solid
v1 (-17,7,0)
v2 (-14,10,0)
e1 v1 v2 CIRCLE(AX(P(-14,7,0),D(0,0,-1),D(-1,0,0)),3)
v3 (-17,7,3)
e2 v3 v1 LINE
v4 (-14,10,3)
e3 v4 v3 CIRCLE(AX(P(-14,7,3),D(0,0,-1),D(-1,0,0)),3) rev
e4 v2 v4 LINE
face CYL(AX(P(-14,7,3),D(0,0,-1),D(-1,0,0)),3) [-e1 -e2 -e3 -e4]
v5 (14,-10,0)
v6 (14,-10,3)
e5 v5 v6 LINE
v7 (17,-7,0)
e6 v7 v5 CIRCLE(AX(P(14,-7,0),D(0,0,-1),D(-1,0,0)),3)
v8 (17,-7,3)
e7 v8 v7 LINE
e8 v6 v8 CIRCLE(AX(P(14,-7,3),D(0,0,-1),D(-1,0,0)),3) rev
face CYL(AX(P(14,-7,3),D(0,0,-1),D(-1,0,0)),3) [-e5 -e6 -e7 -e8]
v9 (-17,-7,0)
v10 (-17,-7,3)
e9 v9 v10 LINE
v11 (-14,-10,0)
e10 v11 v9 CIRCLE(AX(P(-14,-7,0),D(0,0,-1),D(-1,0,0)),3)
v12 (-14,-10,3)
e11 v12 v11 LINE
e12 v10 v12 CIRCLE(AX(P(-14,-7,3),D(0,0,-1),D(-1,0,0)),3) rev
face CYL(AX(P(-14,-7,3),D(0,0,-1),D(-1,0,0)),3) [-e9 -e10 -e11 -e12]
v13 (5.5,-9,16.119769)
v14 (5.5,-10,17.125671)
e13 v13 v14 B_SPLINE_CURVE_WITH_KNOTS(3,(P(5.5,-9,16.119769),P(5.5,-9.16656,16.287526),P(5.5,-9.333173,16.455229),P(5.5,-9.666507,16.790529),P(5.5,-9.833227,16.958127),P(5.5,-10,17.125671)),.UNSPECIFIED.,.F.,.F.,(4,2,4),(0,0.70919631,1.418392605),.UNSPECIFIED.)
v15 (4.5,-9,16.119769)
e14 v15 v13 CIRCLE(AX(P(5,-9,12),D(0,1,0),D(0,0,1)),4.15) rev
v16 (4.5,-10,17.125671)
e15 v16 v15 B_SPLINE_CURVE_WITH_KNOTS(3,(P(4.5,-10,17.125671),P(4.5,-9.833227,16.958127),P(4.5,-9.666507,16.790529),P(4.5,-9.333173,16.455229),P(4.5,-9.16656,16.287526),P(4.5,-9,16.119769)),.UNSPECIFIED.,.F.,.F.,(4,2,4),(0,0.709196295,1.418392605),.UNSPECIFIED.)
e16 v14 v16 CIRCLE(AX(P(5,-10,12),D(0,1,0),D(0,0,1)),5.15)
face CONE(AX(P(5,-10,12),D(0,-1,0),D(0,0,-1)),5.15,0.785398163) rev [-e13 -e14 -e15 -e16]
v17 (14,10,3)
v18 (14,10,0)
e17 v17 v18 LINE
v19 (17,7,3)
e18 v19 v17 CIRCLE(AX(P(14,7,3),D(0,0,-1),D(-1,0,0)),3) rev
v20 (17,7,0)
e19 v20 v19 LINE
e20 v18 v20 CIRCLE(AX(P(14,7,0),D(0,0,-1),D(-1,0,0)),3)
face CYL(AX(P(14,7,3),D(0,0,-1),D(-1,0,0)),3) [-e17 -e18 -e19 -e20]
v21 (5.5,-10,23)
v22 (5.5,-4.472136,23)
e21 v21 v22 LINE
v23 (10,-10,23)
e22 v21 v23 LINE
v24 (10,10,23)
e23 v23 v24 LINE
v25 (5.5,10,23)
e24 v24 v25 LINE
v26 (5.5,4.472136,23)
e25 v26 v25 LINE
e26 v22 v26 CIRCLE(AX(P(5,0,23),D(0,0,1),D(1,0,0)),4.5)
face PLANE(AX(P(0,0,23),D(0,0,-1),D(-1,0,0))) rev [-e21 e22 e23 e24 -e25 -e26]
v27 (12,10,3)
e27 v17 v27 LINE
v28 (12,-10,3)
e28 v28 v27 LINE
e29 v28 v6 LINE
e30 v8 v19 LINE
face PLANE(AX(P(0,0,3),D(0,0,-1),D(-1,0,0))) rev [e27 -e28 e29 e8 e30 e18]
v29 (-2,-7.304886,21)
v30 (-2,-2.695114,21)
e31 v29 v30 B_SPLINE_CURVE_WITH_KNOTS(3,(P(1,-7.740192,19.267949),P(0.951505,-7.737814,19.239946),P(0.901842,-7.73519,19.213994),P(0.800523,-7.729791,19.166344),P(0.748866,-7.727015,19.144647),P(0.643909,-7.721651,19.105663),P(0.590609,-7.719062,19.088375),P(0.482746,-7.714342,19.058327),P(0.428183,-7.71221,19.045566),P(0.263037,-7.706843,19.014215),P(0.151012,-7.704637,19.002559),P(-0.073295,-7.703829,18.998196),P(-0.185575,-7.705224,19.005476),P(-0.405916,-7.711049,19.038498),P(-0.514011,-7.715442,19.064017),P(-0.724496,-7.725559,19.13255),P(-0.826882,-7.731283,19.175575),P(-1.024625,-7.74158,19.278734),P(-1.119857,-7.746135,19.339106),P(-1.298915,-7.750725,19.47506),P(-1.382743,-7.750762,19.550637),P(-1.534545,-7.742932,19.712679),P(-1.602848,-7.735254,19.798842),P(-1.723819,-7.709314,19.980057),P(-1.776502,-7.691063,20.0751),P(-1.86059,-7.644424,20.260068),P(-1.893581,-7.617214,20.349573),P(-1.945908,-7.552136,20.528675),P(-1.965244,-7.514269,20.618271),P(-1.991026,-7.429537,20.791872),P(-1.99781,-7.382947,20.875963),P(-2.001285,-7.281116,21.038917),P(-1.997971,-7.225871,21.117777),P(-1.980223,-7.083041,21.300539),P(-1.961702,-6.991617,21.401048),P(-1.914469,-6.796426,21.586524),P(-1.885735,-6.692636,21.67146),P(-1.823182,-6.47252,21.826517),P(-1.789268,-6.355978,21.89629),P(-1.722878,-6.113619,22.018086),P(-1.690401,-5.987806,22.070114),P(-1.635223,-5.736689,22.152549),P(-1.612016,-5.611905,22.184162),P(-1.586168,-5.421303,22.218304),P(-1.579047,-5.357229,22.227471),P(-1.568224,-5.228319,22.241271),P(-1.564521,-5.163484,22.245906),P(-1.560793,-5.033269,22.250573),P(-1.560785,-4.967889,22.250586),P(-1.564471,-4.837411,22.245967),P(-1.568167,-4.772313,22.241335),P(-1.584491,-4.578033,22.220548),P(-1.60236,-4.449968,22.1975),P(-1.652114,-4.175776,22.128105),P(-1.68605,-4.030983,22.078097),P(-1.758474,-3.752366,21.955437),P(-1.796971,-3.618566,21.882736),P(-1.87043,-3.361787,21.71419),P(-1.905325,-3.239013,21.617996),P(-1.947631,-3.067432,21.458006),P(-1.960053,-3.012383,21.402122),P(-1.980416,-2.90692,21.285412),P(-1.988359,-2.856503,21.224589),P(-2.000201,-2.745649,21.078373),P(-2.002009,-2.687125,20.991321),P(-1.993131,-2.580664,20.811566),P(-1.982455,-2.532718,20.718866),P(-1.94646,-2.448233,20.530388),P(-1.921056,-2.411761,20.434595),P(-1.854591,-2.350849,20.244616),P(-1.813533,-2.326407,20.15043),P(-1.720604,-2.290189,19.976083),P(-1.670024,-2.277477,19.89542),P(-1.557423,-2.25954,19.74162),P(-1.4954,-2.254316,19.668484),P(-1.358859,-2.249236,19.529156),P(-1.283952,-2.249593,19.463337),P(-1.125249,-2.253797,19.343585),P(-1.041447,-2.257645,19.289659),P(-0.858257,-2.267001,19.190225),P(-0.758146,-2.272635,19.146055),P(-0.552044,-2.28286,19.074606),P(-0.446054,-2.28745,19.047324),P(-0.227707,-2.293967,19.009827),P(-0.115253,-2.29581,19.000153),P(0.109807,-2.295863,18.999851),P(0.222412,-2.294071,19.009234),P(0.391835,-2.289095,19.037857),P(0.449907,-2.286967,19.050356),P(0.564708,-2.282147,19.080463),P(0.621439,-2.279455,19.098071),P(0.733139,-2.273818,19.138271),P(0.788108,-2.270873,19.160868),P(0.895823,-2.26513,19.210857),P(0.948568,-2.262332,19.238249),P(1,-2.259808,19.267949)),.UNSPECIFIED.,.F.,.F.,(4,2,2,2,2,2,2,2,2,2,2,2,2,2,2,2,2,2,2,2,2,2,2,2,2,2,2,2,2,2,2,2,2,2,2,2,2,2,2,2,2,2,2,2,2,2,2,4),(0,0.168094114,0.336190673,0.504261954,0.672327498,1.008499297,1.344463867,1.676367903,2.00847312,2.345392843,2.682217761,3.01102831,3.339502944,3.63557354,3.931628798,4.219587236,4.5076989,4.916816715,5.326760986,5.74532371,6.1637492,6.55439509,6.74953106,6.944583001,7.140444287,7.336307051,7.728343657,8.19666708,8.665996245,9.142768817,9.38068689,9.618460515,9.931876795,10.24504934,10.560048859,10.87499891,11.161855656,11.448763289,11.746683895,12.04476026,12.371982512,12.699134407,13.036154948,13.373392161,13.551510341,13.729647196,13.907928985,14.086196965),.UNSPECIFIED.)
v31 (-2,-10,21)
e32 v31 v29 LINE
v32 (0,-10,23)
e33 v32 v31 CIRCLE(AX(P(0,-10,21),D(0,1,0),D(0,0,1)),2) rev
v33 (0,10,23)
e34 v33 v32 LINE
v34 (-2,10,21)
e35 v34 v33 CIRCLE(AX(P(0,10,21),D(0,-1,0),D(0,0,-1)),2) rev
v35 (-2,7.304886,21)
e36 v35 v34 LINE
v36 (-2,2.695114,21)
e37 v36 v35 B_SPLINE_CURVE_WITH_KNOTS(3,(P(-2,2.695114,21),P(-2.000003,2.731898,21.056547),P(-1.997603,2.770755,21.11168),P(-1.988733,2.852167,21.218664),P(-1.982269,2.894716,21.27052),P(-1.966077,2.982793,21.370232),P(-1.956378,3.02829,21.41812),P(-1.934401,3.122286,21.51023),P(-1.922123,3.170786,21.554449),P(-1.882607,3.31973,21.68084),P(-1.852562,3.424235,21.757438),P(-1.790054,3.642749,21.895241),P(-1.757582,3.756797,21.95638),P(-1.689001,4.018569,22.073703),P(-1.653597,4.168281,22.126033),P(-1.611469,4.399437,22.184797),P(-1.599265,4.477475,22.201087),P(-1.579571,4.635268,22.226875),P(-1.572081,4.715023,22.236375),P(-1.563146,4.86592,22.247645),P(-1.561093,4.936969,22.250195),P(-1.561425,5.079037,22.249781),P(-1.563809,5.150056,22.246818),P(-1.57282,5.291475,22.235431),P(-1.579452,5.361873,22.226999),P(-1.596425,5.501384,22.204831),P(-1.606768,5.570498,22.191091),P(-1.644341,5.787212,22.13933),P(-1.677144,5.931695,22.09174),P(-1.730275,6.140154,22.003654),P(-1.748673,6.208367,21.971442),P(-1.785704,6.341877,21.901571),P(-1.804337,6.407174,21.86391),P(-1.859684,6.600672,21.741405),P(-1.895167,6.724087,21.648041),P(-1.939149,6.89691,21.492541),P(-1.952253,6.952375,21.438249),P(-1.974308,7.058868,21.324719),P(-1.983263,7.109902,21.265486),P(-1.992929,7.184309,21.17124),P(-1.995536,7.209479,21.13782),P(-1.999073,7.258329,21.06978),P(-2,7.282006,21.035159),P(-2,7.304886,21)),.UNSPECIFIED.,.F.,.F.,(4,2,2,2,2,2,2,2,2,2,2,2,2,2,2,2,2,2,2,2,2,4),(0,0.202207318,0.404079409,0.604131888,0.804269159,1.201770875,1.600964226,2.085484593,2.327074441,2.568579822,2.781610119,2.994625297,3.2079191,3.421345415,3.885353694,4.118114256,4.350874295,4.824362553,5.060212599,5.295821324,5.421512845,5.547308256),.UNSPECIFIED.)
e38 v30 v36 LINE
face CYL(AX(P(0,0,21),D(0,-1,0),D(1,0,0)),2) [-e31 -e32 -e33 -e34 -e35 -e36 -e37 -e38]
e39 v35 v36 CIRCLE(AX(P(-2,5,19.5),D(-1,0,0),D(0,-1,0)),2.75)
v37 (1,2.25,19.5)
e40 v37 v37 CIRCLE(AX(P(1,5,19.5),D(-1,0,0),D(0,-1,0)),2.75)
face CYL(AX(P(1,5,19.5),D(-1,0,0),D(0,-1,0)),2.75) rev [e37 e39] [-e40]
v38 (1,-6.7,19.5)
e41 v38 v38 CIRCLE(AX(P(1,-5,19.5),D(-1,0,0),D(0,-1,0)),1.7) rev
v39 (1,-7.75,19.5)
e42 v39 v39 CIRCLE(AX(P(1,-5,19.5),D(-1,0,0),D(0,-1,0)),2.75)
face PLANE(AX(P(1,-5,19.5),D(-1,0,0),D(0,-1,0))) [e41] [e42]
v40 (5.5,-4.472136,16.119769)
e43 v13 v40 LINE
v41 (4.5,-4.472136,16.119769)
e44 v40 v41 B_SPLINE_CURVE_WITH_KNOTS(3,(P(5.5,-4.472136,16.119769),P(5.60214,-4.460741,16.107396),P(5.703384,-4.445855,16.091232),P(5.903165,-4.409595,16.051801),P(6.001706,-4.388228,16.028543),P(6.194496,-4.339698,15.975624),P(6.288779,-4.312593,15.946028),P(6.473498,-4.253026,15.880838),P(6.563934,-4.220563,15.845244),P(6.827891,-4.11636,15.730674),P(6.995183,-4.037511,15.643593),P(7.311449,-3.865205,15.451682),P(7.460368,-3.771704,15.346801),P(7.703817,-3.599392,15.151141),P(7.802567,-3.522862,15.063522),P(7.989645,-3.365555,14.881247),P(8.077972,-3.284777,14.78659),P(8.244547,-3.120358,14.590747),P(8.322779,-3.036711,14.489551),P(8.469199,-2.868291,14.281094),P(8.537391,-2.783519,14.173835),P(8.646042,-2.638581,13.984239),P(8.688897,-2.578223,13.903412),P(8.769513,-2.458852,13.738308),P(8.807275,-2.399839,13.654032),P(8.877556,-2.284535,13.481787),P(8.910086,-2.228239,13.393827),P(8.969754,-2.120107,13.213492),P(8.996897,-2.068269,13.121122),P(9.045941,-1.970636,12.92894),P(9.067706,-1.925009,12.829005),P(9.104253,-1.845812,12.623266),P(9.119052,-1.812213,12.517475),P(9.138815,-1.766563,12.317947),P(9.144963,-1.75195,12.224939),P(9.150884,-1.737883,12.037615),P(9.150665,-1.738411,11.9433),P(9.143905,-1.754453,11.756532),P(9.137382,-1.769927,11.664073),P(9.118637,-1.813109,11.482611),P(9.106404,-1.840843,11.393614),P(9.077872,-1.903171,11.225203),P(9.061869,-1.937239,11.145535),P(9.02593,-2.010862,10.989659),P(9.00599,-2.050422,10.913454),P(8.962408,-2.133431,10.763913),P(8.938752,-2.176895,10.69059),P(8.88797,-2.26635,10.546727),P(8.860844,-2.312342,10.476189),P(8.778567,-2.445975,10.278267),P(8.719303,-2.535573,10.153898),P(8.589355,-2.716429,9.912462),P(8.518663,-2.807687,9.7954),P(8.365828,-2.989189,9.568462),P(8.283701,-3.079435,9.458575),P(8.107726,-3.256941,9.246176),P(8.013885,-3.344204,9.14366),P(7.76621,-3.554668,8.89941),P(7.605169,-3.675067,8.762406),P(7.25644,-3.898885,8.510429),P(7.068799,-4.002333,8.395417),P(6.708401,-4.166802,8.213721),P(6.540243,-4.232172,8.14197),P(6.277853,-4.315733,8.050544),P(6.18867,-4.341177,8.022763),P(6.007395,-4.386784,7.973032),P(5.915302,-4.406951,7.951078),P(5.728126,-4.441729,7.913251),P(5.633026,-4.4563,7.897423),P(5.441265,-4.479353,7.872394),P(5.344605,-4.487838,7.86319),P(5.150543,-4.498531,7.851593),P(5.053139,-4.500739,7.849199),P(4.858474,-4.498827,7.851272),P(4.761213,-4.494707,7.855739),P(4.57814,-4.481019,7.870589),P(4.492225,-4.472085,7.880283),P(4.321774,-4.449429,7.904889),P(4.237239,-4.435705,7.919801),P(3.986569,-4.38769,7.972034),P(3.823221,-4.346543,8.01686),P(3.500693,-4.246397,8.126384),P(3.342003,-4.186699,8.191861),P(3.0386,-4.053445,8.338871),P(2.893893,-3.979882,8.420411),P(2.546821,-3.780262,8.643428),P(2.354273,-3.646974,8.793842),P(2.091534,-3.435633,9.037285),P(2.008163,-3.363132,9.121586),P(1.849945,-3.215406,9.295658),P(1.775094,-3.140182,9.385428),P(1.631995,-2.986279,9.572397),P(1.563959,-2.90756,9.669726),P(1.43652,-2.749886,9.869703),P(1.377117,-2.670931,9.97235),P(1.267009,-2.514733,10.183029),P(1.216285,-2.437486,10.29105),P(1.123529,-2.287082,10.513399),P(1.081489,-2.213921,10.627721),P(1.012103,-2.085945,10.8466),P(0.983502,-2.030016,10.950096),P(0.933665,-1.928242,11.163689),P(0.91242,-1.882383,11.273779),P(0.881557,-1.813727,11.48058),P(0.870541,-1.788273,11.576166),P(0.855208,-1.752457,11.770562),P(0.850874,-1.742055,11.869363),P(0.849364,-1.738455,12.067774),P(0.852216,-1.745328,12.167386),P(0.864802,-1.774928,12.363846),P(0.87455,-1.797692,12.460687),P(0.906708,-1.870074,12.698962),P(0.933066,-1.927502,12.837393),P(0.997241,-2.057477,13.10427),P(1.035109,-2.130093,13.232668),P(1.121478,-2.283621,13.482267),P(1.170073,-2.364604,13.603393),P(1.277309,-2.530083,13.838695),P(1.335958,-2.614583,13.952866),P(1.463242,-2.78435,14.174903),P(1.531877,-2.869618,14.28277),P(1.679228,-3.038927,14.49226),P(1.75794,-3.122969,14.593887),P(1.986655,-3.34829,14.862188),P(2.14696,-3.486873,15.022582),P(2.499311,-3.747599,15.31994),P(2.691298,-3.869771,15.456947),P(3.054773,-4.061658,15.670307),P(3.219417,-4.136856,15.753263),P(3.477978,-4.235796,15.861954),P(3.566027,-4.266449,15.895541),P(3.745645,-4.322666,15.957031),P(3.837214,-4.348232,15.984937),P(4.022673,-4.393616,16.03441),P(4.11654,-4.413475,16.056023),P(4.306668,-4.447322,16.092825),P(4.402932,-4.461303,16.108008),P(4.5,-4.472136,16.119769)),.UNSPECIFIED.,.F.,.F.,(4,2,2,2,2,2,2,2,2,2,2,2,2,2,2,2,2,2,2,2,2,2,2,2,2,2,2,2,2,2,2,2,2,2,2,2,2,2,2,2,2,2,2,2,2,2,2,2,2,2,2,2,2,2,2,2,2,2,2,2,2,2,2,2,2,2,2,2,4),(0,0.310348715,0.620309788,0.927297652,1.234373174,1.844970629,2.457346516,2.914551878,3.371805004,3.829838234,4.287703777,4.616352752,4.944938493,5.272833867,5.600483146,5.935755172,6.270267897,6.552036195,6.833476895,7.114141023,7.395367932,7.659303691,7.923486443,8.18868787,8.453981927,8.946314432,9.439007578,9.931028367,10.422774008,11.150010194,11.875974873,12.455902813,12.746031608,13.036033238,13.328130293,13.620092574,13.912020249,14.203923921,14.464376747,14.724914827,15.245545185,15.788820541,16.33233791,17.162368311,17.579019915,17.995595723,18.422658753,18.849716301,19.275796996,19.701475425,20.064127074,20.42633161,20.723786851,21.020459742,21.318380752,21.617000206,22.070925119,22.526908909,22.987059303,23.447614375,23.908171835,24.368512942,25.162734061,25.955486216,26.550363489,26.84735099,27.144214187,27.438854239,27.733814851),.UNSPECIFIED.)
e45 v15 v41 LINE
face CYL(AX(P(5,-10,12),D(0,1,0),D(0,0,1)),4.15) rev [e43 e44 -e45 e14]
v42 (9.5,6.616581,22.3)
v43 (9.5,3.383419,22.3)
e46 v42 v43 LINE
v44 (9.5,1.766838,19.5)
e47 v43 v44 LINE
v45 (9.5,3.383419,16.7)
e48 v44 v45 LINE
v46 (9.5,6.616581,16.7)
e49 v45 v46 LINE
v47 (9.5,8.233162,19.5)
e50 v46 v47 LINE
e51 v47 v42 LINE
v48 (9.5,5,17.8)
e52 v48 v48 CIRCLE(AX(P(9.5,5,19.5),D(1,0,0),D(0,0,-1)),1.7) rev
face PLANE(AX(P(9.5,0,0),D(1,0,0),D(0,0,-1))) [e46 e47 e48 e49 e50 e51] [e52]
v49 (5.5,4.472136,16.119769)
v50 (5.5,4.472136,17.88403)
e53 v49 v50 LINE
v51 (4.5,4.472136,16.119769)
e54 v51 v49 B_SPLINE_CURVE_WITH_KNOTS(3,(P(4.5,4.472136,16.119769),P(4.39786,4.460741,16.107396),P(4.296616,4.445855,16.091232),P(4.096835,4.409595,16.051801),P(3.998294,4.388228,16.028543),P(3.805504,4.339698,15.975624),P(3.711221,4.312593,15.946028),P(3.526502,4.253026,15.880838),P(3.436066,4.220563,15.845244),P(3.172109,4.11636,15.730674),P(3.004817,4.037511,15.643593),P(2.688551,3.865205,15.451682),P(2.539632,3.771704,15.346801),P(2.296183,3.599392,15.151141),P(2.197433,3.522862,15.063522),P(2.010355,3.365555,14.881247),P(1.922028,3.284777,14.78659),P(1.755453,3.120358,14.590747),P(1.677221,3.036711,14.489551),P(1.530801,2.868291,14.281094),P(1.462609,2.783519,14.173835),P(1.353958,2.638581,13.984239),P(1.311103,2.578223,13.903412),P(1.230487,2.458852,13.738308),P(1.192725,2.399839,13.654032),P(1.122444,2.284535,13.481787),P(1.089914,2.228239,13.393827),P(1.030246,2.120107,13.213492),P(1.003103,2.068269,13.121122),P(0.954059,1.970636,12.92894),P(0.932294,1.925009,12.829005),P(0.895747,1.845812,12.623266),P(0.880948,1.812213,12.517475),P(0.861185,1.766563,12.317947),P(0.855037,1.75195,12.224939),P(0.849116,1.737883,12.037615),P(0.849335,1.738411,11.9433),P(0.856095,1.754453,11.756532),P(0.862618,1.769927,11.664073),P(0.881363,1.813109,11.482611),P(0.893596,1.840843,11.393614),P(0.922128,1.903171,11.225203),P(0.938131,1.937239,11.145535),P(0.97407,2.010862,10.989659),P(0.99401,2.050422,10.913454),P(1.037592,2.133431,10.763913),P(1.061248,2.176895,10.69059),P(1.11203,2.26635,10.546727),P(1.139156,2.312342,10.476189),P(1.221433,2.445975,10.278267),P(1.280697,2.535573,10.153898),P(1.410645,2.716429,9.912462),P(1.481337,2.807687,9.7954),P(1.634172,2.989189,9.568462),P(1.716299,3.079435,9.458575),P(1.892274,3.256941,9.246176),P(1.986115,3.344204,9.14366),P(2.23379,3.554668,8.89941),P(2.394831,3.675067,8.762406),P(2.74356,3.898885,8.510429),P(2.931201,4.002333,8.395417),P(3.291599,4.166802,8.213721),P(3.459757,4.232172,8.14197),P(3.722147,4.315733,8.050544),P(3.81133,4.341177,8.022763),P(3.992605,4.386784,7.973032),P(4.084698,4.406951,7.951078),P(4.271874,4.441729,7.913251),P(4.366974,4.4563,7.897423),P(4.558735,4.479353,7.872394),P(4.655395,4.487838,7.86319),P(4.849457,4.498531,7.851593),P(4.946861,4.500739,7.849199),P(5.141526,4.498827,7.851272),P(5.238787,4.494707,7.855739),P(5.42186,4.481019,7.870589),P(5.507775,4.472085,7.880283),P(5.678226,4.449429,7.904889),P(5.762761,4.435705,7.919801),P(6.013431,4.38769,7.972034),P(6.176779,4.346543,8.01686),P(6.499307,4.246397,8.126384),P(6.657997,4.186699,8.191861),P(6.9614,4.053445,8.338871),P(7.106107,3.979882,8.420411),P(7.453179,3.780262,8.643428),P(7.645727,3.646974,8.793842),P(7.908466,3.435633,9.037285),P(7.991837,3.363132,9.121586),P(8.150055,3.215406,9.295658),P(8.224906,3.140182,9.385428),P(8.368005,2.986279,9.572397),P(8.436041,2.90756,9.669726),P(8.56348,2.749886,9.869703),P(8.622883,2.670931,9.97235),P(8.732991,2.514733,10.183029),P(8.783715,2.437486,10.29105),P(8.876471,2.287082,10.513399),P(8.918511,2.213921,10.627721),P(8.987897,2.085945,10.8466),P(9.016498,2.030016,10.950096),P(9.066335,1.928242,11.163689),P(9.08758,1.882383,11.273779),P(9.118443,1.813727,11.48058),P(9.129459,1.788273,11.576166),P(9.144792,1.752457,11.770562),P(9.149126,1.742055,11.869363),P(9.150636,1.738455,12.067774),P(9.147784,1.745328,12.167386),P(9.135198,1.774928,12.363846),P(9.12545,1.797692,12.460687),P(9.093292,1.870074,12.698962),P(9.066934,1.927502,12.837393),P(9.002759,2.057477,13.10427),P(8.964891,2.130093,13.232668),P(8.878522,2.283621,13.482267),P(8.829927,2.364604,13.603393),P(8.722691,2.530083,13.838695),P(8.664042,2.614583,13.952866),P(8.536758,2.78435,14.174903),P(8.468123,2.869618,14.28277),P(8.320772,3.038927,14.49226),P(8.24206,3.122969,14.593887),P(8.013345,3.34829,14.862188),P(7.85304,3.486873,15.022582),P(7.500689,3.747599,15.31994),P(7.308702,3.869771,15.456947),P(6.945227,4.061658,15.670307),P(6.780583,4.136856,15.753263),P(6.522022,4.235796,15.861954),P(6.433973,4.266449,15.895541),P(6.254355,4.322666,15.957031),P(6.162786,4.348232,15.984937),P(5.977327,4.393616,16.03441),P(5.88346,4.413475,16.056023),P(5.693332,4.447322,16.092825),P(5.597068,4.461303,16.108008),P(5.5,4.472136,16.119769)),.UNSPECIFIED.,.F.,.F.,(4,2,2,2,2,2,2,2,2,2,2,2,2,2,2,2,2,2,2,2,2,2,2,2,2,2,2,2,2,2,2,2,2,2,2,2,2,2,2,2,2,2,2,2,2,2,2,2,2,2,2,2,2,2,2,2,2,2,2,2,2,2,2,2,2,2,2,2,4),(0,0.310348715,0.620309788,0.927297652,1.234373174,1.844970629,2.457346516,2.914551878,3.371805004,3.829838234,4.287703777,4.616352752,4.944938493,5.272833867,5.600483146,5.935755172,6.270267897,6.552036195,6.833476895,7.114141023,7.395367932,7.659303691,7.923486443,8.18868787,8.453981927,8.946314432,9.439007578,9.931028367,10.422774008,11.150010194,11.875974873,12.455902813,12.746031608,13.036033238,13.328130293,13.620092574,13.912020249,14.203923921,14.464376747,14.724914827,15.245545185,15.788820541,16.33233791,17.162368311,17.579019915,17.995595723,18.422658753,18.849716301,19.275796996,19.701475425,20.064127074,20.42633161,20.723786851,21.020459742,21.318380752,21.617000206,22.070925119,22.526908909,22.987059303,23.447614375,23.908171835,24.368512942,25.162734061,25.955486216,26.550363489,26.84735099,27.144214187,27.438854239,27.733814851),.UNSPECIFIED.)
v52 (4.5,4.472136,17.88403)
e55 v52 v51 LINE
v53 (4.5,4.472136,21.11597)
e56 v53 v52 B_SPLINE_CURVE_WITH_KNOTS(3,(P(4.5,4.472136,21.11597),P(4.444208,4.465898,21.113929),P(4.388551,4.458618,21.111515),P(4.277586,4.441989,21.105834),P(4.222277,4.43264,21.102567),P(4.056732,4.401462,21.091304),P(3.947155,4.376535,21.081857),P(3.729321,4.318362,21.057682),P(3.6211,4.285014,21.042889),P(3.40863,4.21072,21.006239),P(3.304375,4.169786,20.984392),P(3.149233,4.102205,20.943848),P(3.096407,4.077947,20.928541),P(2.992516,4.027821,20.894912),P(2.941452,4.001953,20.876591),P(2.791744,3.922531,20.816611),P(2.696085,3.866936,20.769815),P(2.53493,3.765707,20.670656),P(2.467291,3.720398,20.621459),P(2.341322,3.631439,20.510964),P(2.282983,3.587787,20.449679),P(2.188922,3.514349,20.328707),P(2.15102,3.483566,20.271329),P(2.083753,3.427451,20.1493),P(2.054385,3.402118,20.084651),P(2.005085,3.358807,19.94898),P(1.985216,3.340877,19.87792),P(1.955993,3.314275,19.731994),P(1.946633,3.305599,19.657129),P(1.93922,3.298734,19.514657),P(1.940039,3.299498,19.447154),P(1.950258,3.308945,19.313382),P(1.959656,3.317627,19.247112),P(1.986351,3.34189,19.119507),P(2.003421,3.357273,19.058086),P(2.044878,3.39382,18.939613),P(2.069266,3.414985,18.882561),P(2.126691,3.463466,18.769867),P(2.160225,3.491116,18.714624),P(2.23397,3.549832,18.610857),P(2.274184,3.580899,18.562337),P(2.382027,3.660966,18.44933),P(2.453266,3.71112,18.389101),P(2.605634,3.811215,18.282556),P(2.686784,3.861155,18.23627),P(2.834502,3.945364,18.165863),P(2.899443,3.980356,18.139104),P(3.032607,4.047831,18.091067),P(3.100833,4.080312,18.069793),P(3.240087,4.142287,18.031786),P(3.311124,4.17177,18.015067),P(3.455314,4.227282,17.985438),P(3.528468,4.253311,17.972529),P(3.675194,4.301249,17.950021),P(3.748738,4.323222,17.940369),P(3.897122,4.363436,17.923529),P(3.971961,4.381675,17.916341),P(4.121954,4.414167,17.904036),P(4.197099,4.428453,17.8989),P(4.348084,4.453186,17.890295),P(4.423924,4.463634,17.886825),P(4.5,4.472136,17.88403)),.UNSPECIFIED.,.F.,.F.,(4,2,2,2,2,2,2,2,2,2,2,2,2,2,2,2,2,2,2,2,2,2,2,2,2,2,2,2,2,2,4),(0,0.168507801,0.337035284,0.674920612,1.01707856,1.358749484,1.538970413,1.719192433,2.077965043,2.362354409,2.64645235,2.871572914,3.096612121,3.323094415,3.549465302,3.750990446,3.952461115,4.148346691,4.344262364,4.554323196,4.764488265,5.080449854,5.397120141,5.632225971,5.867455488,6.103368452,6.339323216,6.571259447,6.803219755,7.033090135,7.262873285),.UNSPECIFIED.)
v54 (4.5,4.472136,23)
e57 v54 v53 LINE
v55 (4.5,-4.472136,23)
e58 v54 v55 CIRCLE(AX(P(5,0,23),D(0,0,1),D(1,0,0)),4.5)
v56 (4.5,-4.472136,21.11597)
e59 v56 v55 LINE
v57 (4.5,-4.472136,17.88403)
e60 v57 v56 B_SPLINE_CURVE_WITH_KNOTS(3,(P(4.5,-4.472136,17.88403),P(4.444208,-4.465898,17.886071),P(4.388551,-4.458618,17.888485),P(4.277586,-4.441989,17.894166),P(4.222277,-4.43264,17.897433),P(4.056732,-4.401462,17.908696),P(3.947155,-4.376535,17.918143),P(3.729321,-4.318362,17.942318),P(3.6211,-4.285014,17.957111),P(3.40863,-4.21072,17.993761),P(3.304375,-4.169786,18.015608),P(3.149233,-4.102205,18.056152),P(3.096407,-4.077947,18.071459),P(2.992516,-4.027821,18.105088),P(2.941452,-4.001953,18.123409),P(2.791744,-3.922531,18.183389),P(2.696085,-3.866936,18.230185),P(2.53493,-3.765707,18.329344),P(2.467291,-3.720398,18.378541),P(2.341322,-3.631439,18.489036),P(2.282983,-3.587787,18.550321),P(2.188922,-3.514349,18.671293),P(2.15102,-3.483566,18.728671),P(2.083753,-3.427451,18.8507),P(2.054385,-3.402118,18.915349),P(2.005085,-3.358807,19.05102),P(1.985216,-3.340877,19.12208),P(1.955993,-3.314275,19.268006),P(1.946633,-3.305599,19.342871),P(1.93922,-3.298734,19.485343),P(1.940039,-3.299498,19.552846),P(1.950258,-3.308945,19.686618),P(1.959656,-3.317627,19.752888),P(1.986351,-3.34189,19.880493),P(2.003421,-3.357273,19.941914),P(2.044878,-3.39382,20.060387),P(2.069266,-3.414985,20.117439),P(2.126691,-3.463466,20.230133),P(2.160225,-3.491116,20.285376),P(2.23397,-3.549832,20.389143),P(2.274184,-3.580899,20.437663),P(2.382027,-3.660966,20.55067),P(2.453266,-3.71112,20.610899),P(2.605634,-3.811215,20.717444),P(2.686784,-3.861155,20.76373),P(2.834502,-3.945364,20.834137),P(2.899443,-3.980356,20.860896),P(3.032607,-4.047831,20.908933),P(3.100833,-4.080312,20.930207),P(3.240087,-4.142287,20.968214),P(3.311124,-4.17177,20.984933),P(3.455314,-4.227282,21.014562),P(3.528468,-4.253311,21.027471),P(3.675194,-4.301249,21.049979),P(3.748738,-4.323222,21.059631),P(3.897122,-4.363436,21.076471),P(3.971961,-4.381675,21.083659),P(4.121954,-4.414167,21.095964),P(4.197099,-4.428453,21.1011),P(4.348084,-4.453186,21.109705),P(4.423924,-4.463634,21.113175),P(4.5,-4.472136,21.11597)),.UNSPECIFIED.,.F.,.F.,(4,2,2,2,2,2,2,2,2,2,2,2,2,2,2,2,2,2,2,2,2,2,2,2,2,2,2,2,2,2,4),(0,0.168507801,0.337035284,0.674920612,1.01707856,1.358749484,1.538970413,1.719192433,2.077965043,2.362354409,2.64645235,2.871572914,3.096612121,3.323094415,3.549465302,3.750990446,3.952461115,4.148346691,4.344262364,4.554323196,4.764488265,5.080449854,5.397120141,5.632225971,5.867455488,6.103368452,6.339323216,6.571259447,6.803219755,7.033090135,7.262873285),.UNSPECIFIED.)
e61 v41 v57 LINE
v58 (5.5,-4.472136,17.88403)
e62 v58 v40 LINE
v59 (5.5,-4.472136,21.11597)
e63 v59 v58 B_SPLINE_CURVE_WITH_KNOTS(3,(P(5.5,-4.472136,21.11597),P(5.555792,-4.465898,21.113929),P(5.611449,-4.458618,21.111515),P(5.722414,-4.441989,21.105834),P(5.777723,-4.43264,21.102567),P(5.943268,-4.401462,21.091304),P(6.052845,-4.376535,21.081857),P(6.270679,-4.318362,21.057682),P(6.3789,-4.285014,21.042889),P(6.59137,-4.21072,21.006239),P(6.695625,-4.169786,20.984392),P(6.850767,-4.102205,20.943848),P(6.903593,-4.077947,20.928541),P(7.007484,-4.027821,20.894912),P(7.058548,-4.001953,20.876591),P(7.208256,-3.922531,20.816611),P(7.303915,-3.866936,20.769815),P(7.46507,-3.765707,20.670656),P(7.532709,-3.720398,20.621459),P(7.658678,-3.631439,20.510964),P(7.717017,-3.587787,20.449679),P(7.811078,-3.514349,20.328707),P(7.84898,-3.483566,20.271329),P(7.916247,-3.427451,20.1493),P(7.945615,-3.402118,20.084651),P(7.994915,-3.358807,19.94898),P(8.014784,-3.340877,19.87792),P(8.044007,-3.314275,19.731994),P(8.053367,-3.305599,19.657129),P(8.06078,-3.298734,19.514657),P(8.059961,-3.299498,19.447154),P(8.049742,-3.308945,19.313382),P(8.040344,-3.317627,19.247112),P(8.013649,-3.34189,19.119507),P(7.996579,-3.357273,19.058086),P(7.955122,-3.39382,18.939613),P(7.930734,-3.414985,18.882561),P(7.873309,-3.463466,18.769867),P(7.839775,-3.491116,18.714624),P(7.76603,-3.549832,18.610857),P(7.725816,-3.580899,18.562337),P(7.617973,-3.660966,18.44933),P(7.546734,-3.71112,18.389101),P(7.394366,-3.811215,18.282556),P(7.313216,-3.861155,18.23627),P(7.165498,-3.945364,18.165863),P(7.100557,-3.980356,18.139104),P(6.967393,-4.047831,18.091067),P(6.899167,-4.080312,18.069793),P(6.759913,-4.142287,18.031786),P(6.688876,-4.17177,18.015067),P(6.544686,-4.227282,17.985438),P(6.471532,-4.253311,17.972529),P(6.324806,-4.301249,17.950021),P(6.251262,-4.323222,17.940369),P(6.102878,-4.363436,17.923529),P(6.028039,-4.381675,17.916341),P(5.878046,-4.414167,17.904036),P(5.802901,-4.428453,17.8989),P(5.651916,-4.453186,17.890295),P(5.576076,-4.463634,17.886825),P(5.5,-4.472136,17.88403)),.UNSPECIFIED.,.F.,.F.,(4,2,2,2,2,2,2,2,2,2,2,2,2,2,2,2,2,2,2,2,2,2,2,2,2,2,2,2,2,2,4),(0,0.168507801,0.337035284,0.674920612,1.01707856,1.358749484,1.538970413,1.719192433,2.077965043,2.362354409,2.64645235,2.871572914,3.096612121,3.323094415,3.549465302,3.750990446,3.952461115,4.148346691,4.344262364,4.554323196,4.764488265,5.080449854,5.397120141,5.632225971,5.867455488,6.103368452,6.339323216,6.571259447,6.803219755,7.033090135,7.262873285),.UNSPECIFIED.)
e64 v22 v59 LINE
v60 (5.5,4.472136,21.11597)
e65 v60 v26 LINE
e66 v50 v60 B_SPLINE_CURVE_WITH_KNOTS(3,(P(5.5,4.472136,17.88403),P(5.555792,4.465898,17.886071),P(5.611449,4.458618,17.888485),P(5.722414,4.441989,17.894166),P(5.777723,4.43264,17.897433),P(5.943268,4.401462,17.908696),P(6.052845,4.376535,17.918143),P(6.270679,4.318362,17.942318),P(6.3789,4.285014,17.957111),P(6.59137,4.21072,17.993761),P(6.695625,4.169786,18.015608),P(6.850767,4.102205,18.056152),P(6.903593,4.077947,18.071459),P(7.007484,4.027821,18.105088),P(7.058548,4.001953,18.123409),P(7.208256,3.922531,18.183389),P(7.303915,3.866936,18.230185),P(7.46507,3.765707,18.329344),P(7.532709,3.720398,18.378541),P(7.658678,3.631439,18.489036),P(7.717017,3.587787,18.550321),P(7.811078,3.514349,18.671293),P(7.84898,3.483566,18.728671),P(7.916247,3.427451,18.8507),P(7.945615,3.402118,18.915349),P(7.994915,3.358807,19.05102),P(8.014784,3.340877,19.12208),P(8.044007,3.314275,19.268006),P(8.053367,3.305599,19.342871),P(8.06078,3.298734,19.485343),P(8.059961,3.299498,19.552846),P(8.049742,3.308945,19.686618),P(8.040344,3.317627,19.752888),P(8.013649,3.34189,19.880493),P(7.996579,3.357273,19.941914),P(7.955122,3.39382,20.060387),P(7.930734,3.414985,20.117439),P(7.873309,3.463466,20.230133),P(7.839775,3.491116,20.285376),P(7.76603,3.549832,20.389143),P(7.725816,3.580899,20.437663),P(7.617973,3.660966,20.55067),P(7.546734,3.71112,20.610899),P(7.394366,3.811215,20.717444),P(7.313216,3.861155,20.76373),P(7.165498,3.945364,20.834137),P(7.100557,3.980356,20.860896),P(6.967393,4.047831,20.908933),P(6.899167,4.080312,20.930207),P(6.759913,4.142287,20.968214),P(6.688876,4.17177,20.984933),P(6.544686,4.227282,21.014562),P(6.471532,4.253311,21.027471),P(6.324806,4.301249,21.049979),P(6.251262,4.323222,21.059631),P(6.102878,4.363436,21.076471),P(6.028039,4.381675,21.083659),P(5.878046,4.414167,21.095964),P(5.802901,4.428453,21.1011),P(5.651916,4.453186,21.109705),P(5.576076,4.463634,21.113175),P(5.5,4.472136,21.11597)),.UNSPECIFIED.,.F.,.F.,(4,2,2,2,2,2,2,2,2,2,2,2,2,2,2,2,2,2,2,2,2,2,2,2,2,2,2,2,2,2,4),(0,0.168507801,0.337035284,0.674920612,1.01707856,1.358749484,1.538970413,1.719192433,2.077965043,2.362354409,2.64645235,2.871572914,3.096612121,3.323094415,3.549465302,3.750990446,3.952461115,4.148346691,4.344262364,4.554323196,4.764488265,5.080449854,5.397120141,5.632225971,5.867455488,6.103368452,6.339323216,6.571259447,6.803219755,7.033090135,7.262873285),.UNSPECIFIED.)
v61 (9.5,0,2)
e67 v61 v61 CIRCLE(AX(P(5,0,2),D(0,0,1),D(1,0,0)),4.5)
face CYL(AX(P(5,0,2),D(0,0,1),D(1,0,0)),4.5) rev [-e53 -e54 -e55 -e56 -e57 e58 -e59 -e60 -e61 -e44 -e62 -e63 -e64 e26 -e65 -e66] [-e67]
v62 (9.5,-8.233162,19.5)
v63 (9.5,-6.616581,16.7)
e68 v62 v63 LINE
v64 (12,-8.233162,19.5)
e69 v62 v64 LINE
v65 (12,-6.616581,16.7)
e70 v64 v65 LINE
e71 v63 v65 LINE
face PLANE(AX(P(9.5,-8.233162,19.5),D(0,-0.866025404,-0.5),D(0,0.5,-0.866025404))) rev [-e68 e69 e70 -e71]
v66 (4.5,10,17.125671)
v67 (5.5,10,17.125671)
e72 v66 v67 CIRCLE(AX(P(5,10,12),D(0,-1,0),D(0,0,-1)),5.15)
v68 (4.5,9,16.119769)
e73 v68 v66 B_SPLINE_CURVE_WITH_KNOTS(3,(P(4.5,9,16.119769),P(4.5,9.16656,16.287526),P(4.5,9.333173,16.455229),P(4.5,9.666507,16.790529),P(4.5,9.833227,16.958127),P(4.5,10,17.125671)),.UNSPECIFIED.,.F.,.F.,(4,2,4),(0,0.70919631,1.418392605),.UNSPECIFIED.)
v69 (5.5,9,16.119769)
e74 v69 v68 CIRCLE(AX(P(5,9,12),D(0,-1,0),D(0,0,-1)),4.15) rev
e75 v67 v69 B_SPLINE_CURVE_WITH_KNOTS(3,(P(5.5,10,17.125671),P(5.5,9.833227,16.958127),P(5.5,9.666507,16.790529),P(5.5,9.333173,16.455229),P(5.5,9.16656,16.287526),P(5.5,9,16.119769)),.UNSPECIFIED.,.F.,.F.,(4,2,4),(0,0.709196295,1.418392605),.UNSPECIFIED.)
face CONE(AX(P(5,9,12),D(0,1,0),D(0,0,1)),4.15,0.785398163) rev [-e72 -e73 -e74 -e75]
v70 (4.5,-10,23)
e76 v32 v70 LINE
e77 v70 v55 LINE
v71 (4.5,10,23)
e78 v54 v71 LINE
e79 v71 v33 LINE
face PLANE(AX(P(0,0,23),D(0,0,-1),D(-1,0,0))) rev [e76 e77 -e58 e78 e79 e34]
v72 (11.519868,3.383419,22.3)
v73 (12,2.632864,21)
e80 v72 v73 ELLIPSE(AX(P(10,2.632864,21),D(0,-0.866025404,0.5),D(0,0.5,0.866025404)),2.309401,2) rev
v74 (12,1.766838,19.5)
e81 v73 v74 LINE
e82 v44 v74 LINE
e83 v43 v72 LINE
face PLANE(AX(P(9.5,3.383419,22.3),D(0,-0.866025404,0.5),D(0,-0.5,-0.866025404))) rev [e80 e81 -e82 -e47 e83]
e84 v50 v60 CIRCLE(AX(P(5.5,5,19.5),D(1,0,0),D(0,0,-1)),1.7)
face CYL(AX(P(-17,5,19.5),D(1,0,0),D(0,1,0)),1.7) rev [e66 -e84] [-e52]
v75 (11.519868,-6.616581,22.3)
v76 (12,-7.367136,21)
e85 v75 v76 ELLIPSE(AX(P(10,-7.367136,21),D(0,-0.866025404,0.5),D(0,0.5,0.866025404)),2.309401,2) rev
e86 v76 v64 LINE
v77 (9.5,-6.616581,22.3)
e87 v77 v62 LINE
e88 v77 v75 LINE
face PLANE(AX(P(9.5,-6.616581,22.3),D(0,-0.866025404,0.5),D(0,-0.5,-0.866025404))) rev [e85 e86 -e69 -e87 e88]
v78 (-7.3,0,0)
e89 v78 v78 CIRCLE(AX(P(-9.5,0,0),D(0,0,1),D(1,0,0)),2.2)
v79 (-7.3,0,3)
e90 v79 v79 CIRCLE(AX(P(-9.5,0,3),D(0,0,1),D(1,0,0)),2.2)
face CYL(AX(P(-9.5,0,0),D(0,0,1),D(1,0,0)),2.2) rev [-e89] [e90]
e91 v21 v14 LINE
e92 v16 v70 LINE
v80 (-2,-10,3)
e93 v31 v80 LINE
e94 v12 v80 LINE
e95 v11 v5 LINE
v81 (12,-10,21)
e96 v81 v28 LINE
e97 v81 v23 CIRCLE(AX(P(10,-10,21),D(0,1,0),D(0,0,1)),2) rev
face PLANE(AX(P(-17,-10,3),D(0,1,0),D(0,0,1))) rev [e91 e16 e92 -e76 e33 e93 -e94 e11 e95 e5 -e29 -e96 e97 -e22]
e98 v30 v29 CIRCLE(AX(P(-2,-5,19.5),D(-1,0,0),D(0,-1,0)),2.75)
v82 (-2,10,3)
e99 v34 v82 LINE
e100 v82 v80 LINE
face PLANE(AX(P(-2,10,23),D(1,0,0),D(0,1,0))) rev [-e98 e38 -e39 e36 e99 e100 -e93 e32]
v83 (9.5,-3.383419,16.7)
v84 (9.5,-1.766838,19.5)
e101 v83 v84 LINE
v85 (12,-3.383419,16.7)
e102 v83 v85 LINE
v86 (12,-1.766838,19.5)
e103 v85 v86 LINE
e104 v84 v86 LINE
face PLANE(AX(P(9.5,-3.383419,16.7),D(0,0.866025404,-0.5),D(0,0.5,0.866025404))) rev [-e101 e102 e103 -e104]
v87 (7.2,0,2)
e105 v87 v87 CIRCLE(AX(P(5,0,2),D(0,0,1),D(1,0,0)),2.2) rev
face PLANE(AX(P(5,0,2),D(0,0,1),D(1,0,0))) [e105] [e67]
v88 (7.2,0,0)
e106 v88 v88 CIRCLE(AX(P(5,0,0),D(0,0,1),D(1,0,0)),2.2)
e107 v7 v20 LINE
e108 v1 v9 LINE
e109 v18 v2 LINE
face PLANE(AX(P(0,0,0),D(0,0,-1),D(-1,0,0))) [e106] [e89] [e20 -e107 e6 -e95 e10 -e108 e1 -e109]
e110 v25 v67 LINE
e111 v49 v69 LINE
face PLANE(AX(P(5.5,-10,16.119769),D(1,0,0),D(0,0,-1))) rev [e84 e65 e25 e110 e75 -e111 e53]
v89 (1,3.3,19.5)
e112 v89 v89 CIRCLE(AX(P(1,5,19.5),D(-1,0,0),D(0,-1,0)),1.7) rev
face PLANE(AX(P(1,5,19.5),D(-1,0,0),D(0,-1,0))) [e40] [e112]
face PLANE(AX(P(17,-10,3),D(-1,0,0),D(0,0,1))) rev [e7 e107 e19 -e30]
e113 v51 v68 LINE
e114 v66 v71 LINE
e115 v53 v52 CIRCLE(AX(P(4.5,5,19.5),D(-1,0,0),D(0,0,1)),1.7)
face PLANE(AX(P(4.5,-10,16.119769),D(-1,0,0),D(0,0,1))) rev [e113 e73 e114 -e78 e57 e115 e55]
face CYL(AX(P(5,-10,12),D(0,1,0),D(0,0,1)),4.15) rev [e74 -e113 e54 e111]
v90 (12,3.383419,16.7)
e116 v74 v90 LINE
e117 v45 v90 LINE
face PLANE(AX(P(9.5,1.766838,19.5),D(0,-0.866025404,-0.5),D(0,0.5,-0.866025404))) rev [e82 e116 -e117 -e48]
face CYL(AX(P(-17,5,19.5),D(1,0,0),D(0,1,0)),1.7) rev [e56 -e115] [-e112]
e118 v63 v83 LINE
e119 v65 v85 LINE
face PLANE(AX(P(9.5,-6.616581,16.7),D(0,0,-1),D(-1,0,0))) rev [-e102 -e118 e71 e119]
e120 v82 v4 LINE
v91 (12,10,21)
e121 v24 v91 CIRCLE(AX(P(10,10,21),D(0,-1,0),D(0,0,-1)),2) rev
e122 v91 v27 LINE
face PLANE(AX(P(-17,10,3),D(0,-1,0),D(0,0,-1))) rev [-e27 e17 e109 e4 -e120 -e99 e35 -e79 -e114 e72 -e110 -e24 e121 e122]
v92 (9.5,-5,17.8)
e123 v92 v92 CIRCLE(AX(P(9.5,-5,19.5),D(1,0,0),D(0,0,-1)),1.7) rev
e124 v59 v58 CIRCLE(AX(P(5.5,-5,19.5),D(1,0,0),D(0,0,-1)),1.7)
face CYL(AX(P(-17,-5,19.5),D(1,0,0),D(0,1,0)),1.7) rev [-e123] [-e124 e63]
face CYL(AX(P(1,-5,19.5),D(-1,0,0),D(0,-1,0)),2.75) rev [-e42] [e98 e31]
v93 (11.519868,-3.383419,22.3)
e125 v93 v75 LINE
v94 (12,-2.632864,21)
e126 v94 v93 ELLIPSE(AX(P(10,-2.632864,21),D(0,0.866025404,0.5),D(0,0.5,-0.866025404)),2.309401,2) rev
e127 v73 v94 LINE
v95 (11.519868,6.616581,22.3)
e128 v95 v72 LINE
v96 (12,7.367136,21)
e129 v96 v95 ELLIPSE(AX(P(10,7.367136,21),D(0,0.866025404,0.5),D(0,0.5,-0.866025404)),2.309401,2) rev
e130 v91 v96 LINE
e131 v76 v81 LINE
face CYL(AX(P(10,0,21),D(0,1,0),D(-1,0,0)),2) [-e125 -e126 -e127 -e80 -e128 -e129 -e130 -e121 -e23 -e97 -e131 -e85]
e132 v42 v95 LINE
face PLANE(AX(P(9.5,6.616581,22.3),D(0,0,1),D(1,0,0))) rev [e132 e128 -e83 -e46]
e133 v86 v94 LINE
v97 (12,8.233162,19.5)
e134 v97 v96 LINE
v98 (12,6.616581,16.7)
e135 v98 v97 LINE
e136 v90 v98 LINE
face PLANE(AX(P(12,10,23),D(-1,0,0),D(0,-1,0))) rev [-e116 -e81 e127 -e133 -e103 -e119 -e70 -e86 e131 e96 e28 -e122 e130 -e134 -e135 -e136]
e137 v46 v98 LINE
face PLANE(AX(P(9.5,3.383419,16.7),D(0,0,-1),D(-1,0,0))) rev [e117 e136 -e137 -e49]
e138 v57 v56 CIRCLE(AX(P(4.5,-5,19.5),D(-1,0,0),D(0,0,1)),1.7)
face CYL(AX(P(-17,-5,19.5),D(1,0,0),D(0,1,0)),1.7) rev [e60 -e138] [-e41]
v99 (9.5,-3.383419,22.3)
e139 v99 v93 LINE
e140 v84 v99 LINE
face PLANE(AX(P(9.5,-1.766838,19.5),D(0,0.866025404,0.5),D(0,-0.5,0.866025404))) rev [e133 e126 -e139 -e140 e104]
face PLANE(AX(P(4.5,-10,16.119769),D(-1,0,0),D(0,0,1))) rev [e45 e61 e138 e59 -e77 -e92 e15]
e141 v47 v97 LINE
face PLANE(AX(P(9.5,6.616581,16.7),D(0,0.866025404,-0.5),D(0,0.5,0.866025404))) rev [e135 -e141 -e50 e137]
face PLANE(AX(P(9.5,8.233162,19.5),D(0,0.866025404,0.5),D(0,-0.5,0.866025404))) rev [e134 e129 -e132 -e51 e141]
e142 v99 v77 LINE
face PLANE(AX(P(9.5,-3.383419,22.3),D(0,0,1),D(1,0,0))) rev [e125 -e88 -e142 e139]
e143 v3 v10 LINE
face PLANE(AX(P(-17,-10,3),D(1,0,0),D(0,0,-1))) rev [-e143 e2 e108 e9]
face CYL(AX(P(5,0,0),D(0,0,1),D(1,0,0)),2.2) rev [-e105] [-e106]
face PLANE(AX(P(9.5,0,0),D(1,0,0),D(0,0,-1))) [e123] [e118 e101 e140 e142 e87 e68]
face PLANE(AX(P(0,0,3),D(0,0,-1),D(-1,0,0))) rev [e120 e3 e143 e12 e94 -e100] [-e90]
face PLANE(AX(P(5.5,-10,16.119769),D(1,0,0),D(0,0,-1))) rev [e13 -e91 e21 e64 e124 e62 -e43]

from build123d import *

# Parameters (mm, degrees)
SKETCH1_W           = 34
SKETCH1_H           = 20
BOSS_EXTRUDE1_DEPTH = 3
FILLET1_R           = 3
SKETCH2_W           = 14
SKETCH2_H           = 20
BOSS_EXTRUDE2_DEPTH = 20
CUT_EXTRUDE1_DEPTH  = 35.899856733
CHAMFER1_SIZE       = 1
SKETCH4_R           = 2.2
CUT_EXTRUDE2_DEPTH  = 29.08914381
SKETCH5_R           = 1.7
CUT_EXTRUDE3_DEPTH  = 39.340579025
FILLET2_R           = 2
CUT_EXTRUDE4_DEPTH  = 2.5
SKETCH7_R           = 2.75
CUT_EXTRUDE5_DEPTH  = 3
SKETCH8_R           = 2.2
CUT_EXTRUDE6_DEPTH  = 31.298514848
SKETCH9_R           = 4.5
CUT_EXTRUDE7_DEPTH  = 21


with BuildPart() as part:
    # Sketch1 → Boss-Extrude1 (new body)
    with BuildSketch(Plane.XY):
        Rectangle(SKETCH1_W, SKETCH1_H)
    extrude(amount=BOSS_EXTRUDE1_DEPTH)

    # Fillet1
    fillet1_edges = [part.edges().sort_by_distance(p)[0] for p in [
        (17, -10, 1.5),
        (-17, -10, 1.5),
        (-17, 10, 1.5),
        (17, 10, 1.5),
    ]]
    fillet(fillet1_edges, radius=FILLET1_R)

    # Sketch2 → Boss-Extrude2 (add)
    with BuildSketch(Plane.XY.offset(3)):
        with Locations((5, 0)):
            Rectangle(SKETCH2_W, SKETCH2_H)
    extrude(amount=BOSS_EXTRUDE2_DEPTH)

    # Sketch3 → Cut-Extrude1 (cut, through all)
    with BuildSketch(Plane(origin=(0, 10, 0), x_dir=(1, 0, 0), z_dir=(0, 1, 0))):
        with BuildLine():
            Line((4.5, -16.119769411), (4.5, -23))
            Line((4.5, -23), (5.5, -23))
            Line((5.5, -23), (5.5, -16.119769411))
            ThreePointArc((5.5, -16.119769411), (5, -7.85), (4.5, -16.119769411))
        make_face()
    extrude(amount=-CUT_EXTRUDE1_DEPTH, mode=Mode.SUBTRACT)

    # Chamfer1
    chamfer1_edges = [part.edges().sort_by_distance(p)[0] for p in [
        (5, -10, 7.85),
        (5, 10, 7.85),
    ]]
    chamfer(chamfer1_edges, length=CHAMFER1_SIZE)

    # Sketch4 → Cut-Extrude2 (cut, through all)
    with BuildSketch(Plane.XY.offset(3)):
        with Locations((-9.5, 0)):
            Circle(SKETCH4_R)
    extrude(amount=-CUT_EXTRUDE2_DEPTH, mode=Mode.SUBTRACT)

    # Sketch5 → Cut-Extrude3 (cut, through all)
    with BuildSketch(Plane(origin=(12, 0, 0), x_dir=(0, 0, -1), z_dir=(1, 0, 0))):
        with Locations(Location((-19.5, 5, 0), (0, 0, 90))):
            Circle(SKETCH5_R)
        with Locations(Location((-19.5, -5, 0), (0, 0, 90))):
            Circle(SKETCH5_R)
    extrude(amount=-CUT_EXTRUDE3_DEPTH, mode=Mode.SUBTRACT)

    # Fillet2
    # the kernel refuses this fillet: 2 mm, written as the material it takes off along each edge
    with BuildSketch(Plane(origin=(12, -15, 23), x_dir=(-1, 0, 0), z_dir=(0, 1, 0)), Plane(origin=(-2, 15, 23), x_dir=(1, 0, 0), z_dir=(0, -1, 0))) as fillet2_piece_1:
        with BuildLine():
            CenterArc((FILLET2_R, -FILLET2_R), FILLET2_R, 90, 90)
            Line((0, -FILLET2_R), (0, 0))
            Line((0, 0), (FILLET2_R, 0))
        make_face()
    extrude(amount=30, mode=Mode.SUBTRACT)

    # Sketch6 → Cut-Extrude4 (cut)
    with BuildSketch(Plane(origin=(12, 0, 0), x_dir=(0, 0, -1), z_dir=(1, 0, 0))):
        Polygon((-16.7, 3.383419246), (-16.7, 6.616580754), (-19.5, 8.233161507), (-22.3, 6.616580754), (-22.3, 3.383419246), (-19.5, 1.766838493), align=None)
        Polygon((-16.7, -3.383419246), (-19.5, -1.766838493), (-22.3, -3.383419246), (-22.3, -6.616580754), (-19.5, -8.233161507), (-16.7, -6.616580754), align=None)
    extrude(amount=-CUT_EXTRUDE4_DEPTH, mode=Mode.SUBTRACT)

    # Sketch7 → Cut-Extrude5 (cut)
    with BuildSketch(Plane.ZY.offset(2)):
        with Locations(Location((19.5, 5, 0), (0, 0, 270))):
            Circle(SKETCH7_R)
        with Locations(Location((19.5, -5, 0), (0, 0, 270))):
            Circle(SKETCH7_R)
    extrude(amount=-CUT_EXTRUDE5_DEPTH, mode=Mode.SUBTRACT)

    # Sketch8 → Cut-Extrude6 (cut, through all)
    with BuildSketch(Plane.XY.offset(23)):
        with Locations((5, 0)):
            Circle(SKETCH8_R)
    extrude(amount=-CUT_EXTRUDE6_DEPTH, mode=Mode.SUBTRACT)

    # Sketch9 → Cut-Extrude7 (cut)
    with BuildSketch(Plane.XY.offset(23)):
        with Locations((5, 0)):
            Circle(SKETCH9_R)
    extrude(amount=-CUT_EXTRUDE7_DEPTH, mode=Mode.SUBTRACT)


solid = part.part
